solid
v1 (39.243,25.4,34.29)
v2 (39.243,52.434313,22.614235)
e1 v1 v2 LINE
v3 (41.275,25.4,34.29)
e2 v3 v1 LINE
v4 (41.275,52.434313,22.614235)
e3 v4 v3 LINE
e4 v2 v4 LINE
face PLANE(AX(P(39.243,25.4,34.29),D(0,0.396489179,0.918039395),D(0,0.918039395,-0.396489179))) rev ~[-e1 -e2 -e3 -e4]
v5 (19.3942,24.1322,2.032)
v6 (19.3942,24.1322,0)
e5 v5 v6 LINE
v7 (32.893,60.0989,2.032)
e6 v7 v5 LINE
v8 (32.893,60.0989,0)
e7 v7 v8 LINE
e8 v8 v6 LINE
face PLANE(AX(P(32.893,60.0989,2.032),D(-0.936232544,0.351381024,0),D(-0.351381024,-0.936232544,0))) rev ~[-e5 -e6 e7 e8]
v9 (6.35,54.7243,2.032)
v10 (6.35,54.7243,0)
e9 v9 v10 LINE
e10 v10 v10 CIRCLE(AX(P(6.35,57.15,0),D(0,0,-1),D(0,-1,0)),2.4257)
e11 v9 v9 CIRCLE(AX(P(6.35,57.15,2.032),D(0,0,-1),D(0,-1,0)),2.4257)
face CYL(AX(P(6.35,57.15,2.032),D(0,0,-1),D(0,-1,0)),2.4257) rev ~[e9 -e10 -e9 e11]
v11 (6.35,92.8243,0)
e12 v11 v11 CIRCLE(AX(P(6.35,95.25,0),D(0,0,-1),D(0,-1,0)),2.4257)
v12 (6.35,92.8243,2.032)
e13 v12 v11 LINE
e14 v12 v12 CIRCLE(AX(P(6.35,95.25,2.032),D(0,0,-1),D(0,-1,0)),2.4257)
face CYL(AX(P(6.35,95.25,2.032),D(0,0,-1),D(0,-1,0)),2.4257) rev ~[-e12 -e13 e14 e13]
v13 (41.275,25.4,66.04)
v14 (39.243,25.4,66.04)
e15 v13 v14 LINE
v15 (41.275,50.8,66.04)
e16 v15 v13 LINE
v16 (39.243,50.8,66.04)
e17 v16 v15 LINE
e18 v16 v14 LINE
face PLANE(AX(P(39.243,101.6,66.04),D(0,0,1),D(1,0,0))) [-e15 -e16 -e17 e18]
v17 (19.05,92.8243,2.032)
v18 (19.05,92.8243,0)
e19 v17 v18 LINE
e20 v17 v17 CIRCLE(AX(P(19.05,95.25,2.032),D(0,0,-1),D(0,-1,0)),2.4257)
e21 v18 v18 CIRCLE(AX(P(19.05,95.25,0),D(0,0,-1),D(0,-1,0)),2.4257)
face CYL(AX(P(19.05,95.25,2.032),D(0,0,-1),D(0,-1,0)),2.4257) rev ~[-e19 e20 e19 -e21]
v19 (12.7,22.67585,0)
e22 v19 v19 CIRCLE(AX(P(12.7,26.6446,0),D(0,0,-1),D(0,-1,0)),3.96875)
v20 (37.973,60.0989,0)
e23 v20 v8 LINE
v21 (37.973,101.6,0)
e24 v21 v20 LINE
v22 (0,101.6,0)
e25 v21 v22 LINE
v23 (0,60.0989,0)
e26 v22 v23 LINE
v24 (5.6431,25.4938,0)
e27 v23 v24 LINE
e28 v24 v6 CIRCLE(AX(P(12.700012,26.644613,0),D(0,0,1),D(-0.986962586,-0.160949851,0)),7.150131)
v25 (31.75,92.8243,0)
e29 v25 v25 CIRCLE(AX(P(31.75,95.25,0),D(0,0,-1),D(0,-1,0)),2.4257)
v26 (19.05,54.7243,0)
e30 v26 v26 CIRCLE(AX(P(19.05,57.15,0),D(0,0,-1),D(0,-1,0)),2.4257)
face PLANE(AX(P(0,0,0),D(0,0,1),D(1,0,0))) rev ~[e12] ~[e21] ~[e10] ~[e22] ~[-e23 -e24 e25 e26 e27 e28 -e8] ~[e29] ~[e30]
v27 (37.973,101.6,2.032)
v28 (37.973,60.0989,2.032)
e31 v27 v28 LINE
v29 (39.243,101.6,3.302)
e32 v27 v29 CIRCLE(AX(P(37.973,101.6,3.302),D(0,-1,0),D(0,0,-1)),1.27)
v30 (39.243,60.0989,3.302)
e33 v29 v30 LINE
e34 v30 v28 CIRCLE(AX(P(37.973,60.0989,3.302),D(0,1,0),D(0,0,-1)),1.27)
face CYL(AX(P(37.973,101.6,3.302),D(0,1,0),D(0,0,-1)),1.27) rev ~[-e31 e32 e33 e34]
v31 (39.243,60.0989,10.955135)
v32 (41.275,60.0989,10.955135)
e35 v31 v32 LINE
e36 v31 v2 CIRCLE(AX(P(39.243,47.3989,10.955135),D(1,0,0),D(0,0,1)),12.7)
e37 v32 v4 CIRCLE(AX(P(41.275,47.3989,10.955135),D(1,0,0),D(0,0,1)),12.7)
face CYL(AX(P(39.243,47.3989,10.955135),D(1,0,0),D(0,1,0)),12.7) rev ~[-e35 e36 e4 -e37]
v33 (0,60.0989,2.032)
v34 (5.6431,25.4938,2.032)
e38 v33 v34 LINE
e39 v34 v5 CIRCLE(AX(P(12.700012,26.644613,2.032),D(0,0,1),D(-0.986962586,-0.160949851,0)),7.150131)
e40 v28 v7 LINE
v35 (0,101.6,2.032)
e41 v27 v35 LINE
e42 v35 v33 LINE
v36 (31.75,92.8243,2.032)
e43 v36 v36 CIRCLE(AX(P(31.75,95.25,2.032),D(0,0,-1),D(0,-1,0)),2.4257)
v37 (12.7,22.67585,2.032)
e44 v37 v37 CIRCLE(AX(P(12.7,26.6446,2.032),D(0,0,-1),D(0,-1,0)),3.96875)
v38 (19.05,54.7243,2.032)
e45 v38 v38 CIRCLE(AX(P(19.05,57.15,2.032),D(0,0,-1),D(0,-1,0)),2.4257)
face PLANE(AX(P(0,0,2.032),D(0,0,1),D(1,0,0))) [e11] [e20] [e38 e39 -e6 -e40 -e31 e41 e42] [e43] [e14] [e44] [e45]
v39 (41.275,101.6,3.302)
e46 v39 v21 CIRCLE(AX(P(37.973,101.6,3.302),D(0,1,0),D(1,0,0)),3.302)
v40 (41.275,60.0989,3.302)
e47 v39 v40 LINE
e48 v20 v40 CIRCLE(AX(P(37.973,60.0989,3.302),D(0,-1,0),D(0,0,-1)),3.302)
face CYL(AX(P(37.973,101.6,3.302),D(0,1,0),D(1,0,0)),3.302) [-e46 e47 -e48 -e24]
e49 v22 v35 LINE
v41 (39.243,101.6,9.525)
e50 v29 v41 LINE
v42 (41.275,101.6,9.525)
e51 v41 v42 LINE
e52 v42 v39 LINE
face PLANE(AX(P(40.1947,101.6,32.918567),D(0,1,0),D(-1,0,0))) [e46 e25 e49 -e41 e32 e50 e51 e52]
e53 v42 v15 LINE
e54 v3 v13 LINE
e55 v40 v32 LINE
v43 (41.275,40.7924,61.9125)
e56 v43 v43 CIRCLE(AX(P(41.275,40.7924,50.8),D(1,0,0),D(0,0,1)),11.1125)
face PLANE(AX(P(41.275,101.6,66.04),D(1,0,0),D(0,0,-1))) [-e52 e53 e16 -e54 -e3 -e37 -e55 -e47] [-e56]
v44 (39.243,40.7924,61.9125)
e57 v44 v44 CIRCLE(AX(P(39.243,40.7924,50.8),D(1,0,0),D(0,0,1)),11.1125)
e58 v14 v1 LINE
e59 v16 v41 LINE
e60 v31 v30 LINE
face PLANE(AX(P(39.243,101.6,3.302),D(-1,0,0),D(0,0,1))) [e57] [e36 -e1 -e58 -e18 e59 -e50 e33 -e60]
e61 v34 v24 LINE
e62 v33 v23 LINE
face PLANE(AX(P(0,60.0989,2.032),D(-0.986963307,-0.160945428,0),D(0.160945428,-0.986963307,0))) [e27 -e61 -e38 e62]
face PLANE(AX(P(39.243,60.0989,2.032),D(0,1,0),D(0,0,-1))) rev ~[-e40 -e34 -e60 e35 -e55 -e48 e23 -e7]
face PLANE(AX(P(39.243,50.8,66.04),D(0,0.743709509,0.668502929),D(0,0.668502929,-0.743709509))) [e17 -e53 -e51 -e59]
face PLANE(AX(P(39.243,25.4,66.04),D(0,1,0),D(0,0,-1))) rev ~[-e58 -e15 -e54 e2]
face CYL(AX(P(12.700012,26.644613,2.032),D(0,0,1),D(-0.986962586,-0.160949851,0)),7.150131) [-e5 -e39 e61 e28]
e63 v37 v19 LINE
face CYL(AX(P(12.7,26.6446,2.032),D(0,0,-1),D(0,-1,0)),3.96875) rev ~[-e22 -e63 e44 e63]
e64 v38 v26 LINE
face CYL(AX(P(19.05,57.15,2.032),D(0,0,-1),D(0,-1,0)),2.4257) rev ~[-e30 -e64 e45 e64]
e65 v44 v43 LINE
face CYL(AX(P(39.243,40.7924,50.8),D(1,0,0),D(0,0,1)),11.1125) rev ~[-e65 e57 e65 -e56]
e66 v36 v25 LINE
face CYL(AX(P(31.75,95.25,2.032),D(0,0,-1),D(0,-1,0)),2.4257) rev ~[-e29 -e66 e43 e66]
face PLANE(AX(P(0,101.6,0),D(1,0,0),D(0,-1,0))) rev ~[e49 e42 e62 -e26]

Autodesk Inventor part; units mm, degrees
ref_plane "YZ Plane" through (0, 0, 0) normal (1, 0, 0) x (0, 1, 0)
ref_plane "XZ Plane" through (0, 0, 0) normal (0, 1, 0) x (-1, 0, 0)
ref_plane "XY Plane" through (0, 0, 0) normal (0, 0, 1) x (1, 0, 0)
sketch "Sketch1" plane through (0, 0, 0) normal (0, 0, 1) x (1, 0, 0)
  line L0 (0, 0) -> (41.275, 0)
  line L1 (41.275, 0) -> (41.275, 101.6)
  line L2 (41.275, 101.6) -> (0, 101.6)
  line L3 (0, 101.6) -> (0, 0)
  dimension "d0" = 101.6
  dimension "d1" = 41.275
extrude "Plate1" add sketch "Sketch1" along normal blind 2.032
sketch "Sketch2" plane through (39.243, 101.6, 0) normal (1, 0, 0) x (0, 1, 0)
  line L0 (-101.6, 0) -> (0, 0)
  line L1 (0, 0) -> (0, 66.04)
  line L2 (0, 66.04) -> (-101.6, 66.04)
  line L3 (-101.6, 66.04) -> (-101.6, 0)
edge flange "Flange1" height 66.04 angle 90 thickness 2.032 bend radius 1.27 thickness toward (1, 0, 0) relief tear relief width 2.032 relief depth 1.016 edges at (41.275, 50.8, 2.032) wall of the first edge with corners at (39.243, 0, 0) (39.243, 101.6, 0) (39.243, 101.6, 66.04) (39.243, 0, 66.04)
bend "Bend1"
corner "Corner1"
sketch "Sketch3" plane through (0, 0, 2.032) normal (0, 0, 1) x (1, 0, 0)
  line L0 (0, 0) -> (0, 101.6) projected
  line L1 (0, 101.6) -> (37.973, 101.6) projected
  point P0 (6.35, 95.25)
  point P1 (6.35, 57.15)
  point P2 (19.05, 95.25)
  point P3 (31.75, 95.25)
  point P4 (19.05, 57.15)
  dimension "d13" = 6.35
  dimension "d14" = 6.35
  dimension "d15" = 38.1
  dimension "d16" = 12.7
  dimension "d17" = 12.7
hole "Hole1" at (6.35, 95.25, 2.032) at (6.35, 57.15, 2.032) at (19.05, 95.25, 2.032) at (31.75, 95.25, 2.032) at (19.05, 57.15, 2.032) direction (0, 0, -1) diameter 4.8514 end through all
sketch "Sketch4" plane through (0, 0, 2.032) normal (0, 0, 1) x (1, 0, 0)
  line L0 (0, 101.6) -> (37.973, 101.6) projected
  line L1 (0, 0) -> (0, 101.6) projected
  point P0 (12.7, 26.6446)
  dimension "d25" = 74.9554
  dimension "d26" = 12.7
hole "Hole2" at (12.7, 26.6446, 2.032) direction (0, 0, -1) diameter 7.9375 end through all
sketch "Sketch5" plane through (0, 0, 2.032) normal (0, 0, 1) x (1, 0, 0)
  circle A0 centre (12.7, 26.6446) radius 3.9687 projected
  arc A1 (5.6431, 25.4938) -> (19.3942, 24.1322) centre (12.7, 26.6446) ccw
  line L0 (37.973, 101.6) -> (37.973, 0) projected
  line L1 (0, 101.6) -> (37.973, 101.6) projected
  line L2 (39.243, 101.6) -> (39.243, 0) projected
  line L3 (39.243, 60.0989) -> (32.893, 60.0989)
  line L4 (32.893, 60.0989) -> (19.3942, 24.1322)
  line L5 (0, 60.0989) -> (5.6431, 25.4938)
  line L6 (0, 0) -> (0, 101.6) projected
  line L7 (37.973, 0) -> (0, 0) projected
  line L8 (0, 60.0989) -> (0, 0)
  line L9 (0, 0) -> (39.243, 0)
  dimension "d34" = 14.3002
  dimension "d37" = 6.35
  dimension "d38" = 41.5011
extrude "Extrusion1" cut sketch "Sketch5" against normal through all contours A1 L4 L3 L0 L7 L6 L5 | L3 L2 L9 L0
sketch "Sketch6" plane through (39.243, 0, 66.04) normal (-1, 0, 0) x (0, 0, 1)
  line L0 (-66.04, 101.6) -> (-66.04, 60.0989) projected
  line L1 (-62.738, 101.6) -> (0, 101.6) projected
  point P0 (-66.04, 0)
  point P1 (-15.24, 40.7924)
  dimension "d41" = 50.8
  dimension "d42" = 60.8076
hole "Hole3" at (39.243, 40.7924, 50.8) direction (1, 0, 0) diameter 22.225 end through all
sketch "Sketch7" plane through (39.243, 0, 66.04) normal (-1, 0, 0) x (0, 0, 1)
  line L0 (0, 0) -> (0, 101.6) projected
  line L1 (0, 25.4) -> (-31.75, 25.4)
  line L2 (-62.738, 101.6) -> (0, 101.6) projected
  line L3 (-64.008, 60.0989) -> (-65.786, 60.0989) projected
  line L4 (-65.786, 60.0989) -> (-46.736, 60.0989)
  line L5 (-31.75, 25.4) -> (-46.736, 60.0989)
  line L6 (0, 25.4) -> (0, 0)
  line L7 (-65.786, 0) -> (-65.786, 60.0989) projected
  line L8 (-65.786, 0) -> (-65.786, 60.0989)
  line L9 (0, 0) -> (-65.786, 0)
  point P0 (-66.04, 0)
  dimension "d50" = 76.2
  dimension "d51" = 31.75
  dimension "d54" = 19.05
extrude "Extrusion2" cut sketch "Sketch7" against normal blind 6.35 and the other way blind 6.35
fillet "Fillet1" radius 12.7 1 edges at (40.259, 60.0989, 19.304)
sketch "Sketch8" plane through (39.243, 101.6, 3.302) normal (-1, 0, 0) x (0, 0, 1)
  line L0 (62.738, -76.2) -> (62.738, 0) projected
  line L1 (62.738, -50.8) -> (62.738, 0)
  line L2 (62.738, 0) -> (6.223, 0)
  line L3 (62.738, 0) -> (0, 0) projected
  line L4 (62.738, -50.8) -> (6.223, 0)
  line L5 (-3.302, 0) -> (-3.302, -41.5011) projected
  point P0 (-3.302, -101.6)
  dimension "d60" = 50.8
  dimension "d61" = 9.525
extrude "Extrusion3" cut sketch "Sketch8" against normal through all
equation "\"d23\" = Thickness"
equation "\"d32\" = Thickness"
equation "\"d48\" = Thickness"
equation "\"d2\" = Thickness"
equation "\"d3\" = BendReliefWidth"
equation "\"d4\" = BendReliefDepth"
equation "\"d5\" = MinimumRemnant"
equation "\"d6\" = TransitionRadius"
equation "\"d9\" = BendRadius"
equation "\"d10\" = CornerReliefSize"
equation "\"d11\" = GapSize"
equation "\"d12\" = JacobiRadiusSize"
equation "\"BendReliefWidth\" = Thickness"
equation "\"BendReliefDepth\" = 0.5 * Thickness"
equation "\"CornerReliefSize\" = 4 * Thickness"
equation "\"MinimumRemnant\" = 2 * Thickness"
equation "\"TransitionRadius\" = BendRadius"
equation "\"JacobiRadiusSize\" = BendRadius"
equation "\"GapSize\" = Thickness"
equation "\"Thickness\" = 2.032"
equation "\"BendRadius\" = 1.27"
properties part number "Roller bracket" material "Aluminum 6061"
